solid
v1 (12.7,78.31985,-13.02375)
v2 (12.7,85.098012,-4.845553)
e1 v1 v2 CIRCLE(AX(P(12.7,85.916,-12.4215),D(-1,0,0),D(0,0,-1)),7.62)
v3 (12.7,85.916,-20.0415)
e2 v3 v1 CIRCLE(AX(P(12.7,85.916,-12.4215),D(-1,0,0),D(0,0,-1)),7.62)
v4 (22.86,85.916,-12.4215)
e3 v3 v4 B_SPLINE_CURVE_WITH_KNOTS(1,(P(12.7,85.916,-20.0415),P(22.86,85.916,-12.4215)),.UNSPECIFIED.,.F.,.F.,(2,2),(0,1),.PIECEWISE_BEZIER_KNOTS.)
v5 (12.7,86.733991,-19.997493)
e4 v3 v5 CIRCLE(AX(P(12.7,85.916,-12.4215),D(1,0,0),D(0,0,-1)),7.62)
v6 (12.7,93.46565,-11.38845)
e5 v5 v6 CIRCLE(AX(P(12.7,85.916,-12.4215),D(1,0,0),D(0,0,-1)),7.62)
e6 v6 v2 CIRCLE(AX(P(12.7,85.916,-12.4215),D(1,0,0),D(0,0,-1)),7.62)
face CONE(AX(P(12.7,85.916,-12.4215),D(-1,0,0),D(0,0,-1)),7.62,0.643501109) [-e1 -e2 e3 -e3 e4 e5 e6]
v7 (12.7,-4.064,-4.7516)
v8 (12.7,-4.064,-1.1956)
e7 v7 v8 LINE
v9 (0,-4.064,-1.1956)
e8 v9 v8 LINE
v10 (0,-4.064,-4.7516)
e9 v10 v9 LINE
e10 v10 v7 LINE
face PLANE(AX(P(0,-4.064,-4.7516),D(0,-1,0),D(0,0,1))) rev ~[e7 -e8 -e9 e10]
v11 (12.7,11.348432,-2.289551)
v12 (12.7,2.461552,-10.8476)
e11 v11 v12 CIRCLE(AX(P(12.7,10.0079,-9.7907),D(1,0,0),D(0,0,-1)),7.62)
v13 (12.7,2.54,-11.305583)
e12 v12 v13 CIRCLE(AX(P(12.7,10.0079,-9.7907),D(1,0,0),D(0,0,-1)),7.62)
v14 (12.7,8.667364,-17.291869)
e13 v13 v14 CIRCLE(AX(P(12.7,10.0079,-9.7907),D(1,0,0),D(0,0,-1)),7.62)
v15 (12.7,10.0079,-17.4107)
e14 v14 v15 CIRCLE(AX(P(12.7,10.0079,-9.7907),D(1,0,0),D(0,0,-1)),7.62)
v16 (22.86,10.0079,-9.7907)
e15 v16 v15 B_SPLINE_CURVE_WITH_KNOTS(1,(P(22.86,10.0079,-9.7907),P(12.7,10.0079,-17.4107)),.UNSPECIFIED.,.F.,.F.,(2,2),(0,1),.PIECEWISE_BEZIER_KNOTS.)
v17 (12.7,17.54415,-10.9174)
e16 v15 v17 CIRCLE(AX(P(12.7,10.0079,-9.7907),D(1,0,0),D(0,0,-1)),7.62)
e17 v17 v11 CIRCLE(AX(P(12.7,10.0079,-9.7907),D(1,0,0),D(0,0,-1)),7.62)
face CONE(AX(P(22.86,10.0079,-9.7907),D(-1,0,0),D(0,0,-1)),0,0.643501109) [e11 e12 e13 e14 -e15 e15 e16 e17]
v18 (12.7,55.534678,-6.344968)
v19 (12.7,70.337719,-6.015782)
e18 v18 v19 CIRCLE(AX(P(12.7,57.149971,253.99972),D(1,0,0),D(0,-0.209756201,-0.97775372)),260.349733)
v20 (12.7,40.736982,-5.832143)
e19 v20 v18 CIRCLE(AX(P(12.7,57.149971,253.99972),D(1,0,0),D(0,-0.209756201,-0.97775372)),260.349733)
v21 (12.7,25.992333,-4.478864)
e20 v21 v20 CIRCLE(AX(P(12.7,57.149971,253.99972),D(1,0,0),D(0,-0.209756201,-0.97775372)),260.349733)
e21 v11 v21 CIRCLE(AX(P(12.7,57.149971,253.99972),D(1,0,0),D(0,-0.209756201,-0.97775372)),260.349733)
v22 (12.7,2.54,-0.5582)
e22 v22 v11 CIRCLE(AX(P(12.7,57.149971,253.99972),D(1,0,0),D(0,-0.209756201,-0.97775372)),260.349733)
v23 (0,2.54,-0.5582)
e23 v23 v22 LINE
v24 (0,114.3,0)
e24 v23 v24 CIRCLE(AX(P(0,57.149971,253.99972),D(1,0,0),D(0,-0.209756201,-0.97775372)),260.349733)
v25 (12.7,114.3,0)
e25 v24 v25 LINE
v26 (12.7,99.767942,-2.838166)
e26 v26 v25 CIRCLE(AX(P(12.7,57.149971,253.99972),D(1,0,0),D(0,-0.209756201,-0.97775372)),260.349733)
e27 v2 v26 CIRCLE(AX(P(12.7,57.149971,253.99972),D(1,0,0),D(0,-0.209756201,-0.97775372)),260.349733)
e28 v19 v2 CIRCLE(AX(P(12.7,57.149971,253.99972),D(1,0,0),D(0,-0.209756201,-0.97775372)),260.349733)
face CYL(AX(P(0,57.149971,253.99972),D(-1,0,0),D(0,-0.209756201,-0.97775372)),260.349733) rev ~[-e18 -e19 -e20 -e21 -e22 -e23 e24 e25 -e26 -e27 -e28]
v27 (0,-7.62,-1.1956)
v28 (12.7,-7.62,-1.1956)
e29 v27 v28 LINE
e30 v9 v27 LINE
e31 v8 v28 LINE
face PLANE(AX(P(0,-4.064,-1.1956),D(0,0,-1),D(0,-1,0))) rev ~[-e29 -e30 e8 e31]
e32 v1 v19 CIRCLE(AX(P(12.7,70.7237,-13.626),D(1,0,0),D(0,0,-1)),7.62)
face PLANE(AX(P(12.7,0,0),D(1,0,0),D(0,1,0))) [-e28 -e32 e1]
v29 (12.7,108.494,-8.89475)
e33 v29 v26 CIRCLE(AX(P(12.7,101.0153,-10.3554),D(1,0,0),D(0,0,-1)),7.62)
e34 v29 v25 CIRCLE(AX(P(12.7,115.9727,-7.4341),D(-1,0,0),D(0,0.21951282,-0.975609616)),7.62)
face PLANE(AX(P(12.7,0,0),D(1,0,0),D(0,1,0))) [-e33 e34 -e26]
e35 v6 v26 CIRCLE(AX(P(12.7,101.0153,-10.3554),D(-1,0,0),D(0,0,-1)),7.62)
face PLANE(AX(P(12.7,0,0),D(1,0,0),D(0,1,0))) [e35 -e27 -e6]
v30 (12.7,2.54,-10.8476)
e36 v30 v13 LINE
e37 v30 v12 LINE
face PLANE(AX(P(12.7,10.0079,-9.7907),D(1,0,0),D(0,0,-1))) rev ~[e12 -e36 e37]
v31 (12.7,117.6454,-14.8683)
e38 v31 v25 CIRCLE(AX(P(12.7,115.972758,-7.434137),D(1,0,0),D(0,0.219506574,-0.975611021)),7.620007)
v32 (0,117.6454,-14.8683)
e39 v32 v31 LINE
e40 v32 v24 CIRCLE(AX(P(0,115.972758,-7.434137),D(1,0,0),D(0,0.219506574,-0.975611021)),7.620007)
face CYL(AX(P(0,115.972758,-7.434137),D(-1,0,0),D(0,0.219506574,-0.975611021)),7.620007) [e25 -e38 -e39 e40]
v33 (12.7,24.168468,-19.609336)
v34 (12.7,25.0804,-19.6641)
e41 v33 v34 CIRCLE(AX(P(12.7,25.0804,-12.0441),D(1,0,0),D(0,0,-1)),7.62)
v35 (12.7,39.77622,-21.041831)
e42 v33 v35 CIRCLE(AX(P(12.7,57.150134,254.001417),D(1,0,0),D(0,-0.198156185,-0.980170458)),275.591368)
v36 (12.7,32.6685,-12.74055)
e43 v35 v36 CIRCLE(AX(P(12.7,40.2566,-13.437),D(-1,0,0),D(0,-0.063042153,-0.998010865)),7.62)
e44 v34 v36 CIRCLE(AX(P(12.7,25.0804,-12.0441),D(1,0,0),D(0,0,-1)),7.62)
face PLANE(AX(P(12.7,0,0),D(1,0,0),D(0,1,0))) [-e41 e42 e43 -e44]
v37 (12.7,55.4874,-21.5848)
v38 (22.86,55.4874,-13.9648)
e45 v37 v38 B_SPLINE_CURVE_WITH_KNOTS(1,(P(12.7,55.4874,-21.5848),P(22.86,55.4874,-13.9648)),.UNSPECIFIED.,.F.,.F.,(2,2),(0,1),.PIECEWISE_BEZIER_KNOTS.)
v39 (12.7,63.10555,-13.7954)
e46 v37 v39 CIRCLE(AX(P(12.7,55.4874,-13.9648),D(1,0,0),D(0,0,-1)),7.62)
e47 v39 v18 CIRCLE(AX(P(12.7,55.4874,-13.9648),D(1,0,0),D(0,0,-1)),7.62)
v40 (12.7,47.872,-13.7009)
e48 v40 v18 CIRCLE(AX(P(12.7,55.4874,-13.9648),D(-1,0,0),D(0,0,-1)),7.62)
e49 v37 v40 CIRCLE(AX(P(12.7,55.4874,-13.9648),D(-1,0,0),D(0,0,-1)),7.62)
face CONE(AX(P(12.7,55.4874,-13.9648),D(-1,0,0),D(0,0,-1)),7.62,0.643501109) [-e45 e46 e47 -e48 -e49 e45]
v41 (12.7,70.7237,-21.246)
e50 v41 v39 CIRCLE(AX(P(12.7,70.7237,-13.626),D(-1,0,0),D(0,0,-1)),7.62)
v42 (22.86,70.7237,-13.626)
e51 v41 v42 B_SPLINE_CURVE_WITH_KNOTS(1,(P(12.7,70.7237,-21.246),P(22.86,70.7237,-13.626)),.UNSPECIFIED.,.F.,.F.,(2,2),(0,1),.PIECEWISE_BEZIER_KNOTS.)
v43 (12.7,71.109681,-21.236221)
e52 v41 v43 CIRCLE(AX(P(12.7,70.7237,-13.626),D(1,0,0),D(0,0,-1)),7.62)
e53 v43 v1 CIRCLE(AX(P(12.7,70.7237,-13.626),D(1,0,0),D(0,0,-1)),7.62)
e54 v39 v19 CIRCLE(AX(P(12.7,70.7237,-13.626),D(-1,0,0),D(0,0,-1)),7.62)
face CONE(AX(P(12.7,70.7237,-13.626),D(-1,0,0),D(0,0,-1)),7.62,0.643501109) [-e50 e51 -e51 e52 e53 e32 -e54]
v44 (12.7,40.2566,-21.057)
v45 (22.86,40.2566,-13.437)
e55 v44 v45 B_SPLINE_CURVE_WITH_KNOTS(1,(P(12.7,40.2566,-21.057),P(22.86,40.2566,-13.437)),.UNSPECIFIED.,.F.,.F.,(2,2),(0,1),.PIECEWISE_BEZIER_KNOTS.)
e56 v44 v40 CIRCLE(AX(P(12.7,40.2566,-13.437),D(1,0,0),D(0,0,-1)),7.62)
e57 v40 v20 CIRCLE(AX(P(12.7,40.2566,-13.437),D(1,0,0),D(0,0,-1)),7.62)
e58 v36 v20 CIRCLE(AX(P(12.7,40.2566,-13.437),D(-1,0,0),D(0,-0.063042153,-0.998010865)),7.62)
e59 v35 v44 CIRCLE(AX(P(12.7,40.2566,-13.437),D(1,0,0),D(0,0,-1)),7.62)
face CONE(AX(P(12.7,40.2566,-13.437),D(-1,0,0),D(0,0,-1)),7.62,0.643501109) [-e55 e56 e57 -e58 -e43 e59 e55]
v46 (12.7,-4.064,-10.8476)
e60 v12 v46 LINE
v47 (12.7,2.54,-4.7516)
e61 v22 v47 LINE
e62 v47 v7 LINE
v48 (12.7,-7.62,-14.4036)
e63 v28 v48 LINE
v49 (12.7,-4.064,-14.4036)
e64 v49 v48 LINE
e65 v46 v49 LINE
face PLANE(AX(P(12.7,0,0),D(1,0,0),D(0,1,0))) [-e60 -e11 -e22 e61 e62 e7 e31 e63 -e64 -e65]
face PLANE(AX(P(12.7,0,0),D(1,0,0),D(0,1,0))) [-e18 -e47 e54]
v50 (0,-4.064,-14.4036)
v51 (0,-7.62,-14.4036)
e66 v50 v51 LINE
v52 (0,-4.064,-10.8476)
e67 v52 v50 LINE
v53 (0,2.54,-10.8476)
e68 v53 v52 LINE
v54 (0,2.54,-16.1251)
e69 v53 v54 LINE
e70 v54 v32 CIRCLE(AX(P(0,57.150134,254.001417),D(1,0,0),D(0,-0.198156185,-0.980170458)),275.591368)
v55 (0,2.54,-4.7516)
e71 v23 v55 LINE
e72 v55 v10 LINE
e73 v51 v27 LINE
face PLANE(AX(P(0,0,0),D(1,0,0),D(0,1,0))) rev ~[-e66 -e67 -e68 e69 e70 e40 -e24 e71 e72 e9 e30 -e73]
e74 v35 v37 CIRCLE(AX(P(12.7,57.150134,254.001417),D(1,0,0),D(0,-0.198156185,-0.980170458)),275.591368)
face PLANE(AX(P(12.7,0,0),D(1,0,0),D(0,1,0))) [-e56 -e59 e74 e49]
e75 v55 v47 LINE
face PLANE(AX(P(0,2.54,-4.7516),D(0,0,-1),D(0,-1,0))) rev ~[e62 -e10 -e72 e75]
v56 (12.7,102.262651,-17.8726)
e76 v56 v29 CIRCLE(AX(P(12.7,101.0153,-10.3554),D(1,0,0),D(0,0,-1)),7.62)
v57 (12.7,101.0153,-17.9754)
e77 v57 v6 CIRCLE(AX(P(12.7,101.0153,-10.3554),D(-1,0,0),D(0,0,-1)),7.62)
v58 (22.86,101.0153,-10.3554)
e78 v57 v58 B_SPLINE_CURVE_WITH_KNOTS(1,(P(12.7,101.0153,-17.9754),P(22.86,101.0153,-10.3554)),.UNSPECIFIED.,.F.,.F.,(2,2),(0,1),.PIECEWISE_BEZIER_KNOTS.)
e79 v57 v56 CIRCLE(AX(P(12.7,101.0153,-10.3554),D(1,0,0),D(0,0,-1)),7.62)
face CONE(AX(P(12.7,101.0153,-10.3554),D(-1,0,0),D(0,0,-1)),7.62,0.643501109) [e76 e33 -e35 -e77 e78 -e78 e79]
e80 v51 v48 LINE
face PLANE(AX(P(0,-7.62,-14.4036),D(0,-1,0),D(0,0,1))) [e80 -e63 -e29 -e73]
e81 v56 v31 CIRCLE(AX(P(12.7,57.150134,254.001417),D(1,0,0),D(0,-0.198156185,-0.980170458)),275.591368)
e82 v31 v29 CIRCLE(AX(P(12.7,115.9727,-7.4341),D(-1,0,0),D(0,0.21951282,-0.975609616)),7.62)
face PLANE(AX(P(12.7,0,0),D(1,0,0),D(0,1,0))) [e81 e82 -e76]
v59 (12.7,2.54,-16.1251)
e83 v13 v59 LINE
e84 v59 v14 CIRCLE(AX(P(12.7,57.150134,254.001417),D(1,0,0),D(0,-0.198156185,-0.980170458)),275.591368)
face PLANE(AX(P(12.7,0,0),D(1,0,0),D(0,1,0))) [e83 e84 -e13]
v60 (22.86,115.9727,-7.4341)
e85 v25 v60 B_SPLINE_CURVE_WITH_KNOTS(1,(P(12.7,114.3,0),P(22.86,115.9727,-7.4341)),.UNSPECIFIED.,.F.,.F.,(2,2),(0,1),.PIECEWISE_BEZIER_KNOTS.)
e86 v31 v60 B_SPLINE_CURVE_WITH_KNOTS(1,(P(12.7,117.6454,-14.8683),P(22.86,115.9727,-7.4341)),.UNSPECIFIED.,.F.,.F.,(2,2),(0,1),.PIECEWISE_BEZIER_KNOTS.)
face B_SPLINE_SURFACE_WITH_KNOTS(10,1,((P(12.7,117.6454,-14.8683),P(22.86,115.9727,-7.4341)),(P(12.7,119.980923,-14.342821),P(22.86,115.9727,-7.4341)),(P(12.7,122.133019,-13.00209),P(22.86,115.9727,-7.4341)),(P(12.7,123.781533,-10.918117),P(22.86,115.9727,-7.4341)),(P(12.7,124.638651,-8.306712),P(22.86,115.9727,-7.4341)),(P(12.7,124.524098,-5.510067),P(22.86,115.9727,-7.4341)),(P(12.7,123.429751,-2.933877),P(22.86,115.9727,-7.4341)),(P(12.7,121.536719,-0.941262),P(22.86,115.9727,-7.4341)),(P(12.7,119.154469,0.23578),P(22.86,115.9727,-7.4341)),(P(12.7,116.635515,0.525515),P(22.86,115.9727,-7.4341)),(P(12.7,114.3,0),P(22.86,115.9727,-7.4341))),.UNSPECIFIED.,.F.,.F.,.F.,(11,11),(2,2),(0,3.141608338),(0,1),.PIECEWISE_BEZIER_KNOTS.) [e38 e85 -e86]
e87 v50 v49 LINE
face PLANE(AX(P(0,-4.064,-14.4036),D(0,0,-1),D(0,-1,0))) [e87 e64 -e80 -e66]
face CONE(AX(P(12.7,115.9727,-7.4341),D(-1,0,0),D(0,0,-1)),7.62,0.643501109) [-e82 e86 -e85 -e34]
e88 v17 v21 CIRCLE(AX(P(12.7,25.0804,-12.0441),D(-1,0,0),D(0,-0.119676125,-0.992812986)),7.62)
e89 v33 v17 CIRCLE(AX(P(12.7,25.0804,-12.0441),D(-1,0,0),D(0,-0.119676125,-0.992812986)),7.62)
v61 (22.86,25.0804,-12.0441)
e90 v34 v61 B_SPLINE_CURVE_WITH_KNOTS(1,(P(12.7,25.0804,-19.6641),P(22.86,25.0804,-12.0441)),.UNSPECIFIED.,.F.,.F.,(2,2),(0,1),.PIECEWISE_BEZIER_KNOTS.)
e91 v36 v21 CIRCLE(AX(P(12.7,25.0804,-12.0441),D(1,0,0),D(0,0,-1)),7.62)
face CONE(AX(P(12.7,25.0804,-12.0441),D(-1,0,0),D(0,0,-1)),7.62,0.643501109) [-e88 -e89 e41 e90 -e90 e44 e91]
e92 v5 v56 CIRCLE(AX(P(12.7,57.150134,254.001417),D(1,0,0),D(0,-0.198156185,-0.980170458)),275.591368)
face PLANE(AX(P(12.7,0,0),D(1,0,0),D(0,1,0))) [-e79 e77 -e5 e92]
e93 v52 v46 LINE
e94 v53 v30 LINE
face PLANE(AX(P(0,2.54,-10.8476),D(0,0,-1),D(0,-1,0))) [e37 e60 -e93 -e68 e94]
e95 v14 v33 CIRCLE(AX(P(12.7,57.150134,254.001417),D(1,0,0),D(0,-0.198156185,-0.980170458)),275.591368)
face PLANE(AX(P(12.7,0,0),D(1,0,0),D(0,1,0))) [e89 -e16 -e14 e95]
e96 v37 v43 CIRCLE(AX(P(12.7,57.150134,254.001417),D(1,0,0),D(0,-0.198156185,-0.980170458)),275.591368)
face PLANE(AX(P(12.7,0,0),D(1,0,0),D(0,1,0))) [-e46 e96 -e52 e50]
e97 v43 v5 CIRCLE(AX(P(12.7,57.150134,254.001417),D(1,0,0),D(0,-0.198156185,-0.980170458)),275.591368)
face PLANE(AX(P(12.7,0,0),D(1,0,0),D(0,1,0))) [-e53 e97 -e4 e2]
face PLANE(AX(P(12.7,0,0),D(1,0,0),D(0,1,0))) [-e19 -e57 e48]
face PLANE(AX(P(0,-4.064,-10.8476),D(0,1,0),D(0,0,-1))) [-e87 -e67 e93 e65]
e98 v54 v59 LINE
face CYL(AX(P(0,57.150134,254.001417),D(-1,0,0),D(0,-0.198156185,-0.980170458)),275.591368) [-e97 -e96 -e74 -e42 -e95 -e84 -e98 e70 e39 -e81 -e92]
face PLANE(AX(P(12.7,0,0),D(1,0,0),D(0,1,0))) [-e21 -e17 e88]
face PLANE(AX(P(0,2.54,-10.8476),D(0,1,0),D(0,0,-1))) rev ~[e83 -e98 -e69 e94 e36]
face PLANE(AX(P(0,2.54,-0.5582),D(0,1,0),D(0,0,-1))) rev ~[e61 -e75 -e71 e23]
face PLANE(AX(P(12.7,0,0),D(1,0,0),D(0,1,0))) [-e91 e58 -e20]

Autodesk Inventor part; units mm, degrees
ref_plane "YZ Plane" through (0, 0, 0) normal (1, 0, 0) x (0, 1, 0)
ref_plane "XZ Plane" through (0, 0, 0) normal (0, 1, 0) x (-1, 0, 0)
sketch "Sketch1" plane through (0, 0, 0) normal (1, 0, 0) x (0, 1, 0)
  arc A0 (0, 0) -> (2.54, -0.5582) centre (57.15, 254) ccw construction
  arc A1 (117.6454, -14.8683) -> (114.3, 0) centre (115.9727, -7.4341) ccw
  line L0 (0, 0) -> (0, -15.5992) construction
  arc A2 (0, -15.5992) -> (2.54, -16.1251) centre (57.15, 254) ccw construction
  line L1 (0, -7.7996) -> (0, -10.8476) construction
  line L2 (2.54, -10.8476) -> (-4.064, -10.8476)
  line L3 (-4.064, -10.8476) -> (-4.064, -14.4036)
  line L4 (-4.064, -14.4036) -> (-7.62, -14.4036)
  line L5 (-7.62, -14.4036) -> (-7.62, -7.7996)
  line L6 (2.54, -7.7996) -> (-7.62, -7.7996) construction
  line L7 (0, -7.7996) -> (0, -4.7516) construction
  line L8 (2.54, -4.7516) -> (-4.064, -4.7516)
  line L9 (-4.064, -4.7516) -> (-4.064, -1.1956)
  line L10 (-4.064, -1.1956) -> (-7.62, -1.1956)
  line L11 (-7.62, -1.1956) -> (-7.62, -7.7996)
  line L12 (0, -7.7996) -> (2.54, -7.7996) construction
  line L13 (2.54, -0.5582) -> (2.54, -4.7516)
  line L14 (2.54, -10.8476) -> (2.54, -16.1251)
  arc A3 (2.54, -16.1251) -> (117.6454, -14.8683) centre (57.15, 254) ccw
  arc A4 (2.54, -0.5582) -> (114.3, 0) centre (57.15, 254) ccw
  point P0 (57.15, -6.35)
  point P1 (0, -10.8476)
  point P2 (0, -4.7516)
  dimension "d0" = 57.15
  dimension "d1" = 114.3
  dimension "d3" = 6.35
  dimension "d8" = 3.048
  dimension "d9" = 6.604
  dimension "d10" = 3.556
  dimension "d11" = 3.556
  dimension "d56" = 2.54
extrude "Extrusion2" add sketch "Sketch1" along normal blind 12.7
sketch "Sketch2" plane through (12.7, 0, 0) normal (1, 0, 0) x (0, 0, -1)
  arc A0 (14.8683, 117.6454) -> (0, 114.3) centre (7.4341, 115.9727) ccw projected
  line L0 (7.4341, 115.9727) -> (14.8683, 117.6454) construction
  line L1 (7.4341, 115.9727) -> (9.1068, 108.5385) construction
  arc A1 (0, 0) -> (0, 114.3) centre (-254, 57.15) ccw projected
  arc A2 (15.5992, 0) -> (14.8683, 117.6454) centre (-254, 57.15) ccw projected
  arc A3 (6.3347, -6.3619) -> (7.4341, 115.9727) centre (-254, 57.15) ccw construction
  line L2 (9.1068, 108.5385) -> (11.4949, 93.4868) construction
  circle A4 centre (7.4341, 115.9727) radius 7.62
  circle A5 centre (10.3554, 101.0153) radius 7.62
  circle A6 centre (13.9648, 55.4874) radius 7.62
  circle A7 centre (12.0441, 25.0804) radius 7.62
  circle A8 centre (13.437, 40.2566) radius 7.62
  circle A9 centre (13.626, 70.7237) radius 7.62
  circle A10 centre (12.4215, 85.916) radius 7.62
  circle A11 centre (9.7907, 10.0079) radius 7.62
  dimension "d14" = 7.62
  dimension "d16" = 15.24
  dimension "d17" = 15.24
  dimension "d18" = 15.24
  dimension "d19" = 15.24
  dimension "d20" = 15.24
  dimension "d21" = 15.24
  dimension "d22" = 15.24
ref_plane "Work Plane1" through (22.86, 0, 0) normal (1, 0, 0) x (0, 0, -1)
sketch "Sketch3" plane through (22.86, 0, 0) normal (1, 0, 0) x (0, 0, -1)
  circle A0 centre (7.4341, 115.9727) radius 7.62 construction
  circle A1 centre (10.3554, 101.0153) radius 7.62 construction
  circle A2 centre (12.4215, 85.916) radius 7.62 construction
  circle A3 centre (13.626, 70.7237) radius 7.62 construction
  circle A4 centre (13.9648, 55.4874) radius 7.62 construction
  circle A5 centre (13.437, 40.2566) radius 7.62 construction
  circle A6 centre (12.0441, 25.0804) radius 7.62 construction
  circle A7 centre (9.7907, 10.0079) radius 7.62 construction
  point P0 (0, 0)
loft "Loft1" add profiles "Sketch2" section 2 point at (22.86, 115.9727, -7.4341) contours A4 A0
loft "Loft2" add profiles "Sketch2" section 2 point at (22.86, 101.0153, -10.3554) contours A5
loft "Loft3" add profiles "Sketch2" section 2 point at (22.86, 85.916, -12.4215) contours A10
loft "Loft4" add profiles "Sketch2" section 2 point at (22.86, 70.7237, -13.626) contours A9
loft "Loft5" add profiles "Sketch2" section 2 point at (22.86, 55.4874, -13.9648) contours A6
loft "Loft6" add profiles "Sketch2" section 2 point at (22.86, 40.2566, -13.437) contours A8
loft "Loft7" add profiles "Sketch2" section 2 point at (22.86, 25.0804, -12.0441) contours A7
loft "Loft8" add profiles "Sketch2" section 1 point at (22.86, 10.0079, -9.7907) contours A11
fillet "Fillet1" [suppressed]
equation "\"d0\" = 0.5 * d1"
properties part number "rake_arm"
